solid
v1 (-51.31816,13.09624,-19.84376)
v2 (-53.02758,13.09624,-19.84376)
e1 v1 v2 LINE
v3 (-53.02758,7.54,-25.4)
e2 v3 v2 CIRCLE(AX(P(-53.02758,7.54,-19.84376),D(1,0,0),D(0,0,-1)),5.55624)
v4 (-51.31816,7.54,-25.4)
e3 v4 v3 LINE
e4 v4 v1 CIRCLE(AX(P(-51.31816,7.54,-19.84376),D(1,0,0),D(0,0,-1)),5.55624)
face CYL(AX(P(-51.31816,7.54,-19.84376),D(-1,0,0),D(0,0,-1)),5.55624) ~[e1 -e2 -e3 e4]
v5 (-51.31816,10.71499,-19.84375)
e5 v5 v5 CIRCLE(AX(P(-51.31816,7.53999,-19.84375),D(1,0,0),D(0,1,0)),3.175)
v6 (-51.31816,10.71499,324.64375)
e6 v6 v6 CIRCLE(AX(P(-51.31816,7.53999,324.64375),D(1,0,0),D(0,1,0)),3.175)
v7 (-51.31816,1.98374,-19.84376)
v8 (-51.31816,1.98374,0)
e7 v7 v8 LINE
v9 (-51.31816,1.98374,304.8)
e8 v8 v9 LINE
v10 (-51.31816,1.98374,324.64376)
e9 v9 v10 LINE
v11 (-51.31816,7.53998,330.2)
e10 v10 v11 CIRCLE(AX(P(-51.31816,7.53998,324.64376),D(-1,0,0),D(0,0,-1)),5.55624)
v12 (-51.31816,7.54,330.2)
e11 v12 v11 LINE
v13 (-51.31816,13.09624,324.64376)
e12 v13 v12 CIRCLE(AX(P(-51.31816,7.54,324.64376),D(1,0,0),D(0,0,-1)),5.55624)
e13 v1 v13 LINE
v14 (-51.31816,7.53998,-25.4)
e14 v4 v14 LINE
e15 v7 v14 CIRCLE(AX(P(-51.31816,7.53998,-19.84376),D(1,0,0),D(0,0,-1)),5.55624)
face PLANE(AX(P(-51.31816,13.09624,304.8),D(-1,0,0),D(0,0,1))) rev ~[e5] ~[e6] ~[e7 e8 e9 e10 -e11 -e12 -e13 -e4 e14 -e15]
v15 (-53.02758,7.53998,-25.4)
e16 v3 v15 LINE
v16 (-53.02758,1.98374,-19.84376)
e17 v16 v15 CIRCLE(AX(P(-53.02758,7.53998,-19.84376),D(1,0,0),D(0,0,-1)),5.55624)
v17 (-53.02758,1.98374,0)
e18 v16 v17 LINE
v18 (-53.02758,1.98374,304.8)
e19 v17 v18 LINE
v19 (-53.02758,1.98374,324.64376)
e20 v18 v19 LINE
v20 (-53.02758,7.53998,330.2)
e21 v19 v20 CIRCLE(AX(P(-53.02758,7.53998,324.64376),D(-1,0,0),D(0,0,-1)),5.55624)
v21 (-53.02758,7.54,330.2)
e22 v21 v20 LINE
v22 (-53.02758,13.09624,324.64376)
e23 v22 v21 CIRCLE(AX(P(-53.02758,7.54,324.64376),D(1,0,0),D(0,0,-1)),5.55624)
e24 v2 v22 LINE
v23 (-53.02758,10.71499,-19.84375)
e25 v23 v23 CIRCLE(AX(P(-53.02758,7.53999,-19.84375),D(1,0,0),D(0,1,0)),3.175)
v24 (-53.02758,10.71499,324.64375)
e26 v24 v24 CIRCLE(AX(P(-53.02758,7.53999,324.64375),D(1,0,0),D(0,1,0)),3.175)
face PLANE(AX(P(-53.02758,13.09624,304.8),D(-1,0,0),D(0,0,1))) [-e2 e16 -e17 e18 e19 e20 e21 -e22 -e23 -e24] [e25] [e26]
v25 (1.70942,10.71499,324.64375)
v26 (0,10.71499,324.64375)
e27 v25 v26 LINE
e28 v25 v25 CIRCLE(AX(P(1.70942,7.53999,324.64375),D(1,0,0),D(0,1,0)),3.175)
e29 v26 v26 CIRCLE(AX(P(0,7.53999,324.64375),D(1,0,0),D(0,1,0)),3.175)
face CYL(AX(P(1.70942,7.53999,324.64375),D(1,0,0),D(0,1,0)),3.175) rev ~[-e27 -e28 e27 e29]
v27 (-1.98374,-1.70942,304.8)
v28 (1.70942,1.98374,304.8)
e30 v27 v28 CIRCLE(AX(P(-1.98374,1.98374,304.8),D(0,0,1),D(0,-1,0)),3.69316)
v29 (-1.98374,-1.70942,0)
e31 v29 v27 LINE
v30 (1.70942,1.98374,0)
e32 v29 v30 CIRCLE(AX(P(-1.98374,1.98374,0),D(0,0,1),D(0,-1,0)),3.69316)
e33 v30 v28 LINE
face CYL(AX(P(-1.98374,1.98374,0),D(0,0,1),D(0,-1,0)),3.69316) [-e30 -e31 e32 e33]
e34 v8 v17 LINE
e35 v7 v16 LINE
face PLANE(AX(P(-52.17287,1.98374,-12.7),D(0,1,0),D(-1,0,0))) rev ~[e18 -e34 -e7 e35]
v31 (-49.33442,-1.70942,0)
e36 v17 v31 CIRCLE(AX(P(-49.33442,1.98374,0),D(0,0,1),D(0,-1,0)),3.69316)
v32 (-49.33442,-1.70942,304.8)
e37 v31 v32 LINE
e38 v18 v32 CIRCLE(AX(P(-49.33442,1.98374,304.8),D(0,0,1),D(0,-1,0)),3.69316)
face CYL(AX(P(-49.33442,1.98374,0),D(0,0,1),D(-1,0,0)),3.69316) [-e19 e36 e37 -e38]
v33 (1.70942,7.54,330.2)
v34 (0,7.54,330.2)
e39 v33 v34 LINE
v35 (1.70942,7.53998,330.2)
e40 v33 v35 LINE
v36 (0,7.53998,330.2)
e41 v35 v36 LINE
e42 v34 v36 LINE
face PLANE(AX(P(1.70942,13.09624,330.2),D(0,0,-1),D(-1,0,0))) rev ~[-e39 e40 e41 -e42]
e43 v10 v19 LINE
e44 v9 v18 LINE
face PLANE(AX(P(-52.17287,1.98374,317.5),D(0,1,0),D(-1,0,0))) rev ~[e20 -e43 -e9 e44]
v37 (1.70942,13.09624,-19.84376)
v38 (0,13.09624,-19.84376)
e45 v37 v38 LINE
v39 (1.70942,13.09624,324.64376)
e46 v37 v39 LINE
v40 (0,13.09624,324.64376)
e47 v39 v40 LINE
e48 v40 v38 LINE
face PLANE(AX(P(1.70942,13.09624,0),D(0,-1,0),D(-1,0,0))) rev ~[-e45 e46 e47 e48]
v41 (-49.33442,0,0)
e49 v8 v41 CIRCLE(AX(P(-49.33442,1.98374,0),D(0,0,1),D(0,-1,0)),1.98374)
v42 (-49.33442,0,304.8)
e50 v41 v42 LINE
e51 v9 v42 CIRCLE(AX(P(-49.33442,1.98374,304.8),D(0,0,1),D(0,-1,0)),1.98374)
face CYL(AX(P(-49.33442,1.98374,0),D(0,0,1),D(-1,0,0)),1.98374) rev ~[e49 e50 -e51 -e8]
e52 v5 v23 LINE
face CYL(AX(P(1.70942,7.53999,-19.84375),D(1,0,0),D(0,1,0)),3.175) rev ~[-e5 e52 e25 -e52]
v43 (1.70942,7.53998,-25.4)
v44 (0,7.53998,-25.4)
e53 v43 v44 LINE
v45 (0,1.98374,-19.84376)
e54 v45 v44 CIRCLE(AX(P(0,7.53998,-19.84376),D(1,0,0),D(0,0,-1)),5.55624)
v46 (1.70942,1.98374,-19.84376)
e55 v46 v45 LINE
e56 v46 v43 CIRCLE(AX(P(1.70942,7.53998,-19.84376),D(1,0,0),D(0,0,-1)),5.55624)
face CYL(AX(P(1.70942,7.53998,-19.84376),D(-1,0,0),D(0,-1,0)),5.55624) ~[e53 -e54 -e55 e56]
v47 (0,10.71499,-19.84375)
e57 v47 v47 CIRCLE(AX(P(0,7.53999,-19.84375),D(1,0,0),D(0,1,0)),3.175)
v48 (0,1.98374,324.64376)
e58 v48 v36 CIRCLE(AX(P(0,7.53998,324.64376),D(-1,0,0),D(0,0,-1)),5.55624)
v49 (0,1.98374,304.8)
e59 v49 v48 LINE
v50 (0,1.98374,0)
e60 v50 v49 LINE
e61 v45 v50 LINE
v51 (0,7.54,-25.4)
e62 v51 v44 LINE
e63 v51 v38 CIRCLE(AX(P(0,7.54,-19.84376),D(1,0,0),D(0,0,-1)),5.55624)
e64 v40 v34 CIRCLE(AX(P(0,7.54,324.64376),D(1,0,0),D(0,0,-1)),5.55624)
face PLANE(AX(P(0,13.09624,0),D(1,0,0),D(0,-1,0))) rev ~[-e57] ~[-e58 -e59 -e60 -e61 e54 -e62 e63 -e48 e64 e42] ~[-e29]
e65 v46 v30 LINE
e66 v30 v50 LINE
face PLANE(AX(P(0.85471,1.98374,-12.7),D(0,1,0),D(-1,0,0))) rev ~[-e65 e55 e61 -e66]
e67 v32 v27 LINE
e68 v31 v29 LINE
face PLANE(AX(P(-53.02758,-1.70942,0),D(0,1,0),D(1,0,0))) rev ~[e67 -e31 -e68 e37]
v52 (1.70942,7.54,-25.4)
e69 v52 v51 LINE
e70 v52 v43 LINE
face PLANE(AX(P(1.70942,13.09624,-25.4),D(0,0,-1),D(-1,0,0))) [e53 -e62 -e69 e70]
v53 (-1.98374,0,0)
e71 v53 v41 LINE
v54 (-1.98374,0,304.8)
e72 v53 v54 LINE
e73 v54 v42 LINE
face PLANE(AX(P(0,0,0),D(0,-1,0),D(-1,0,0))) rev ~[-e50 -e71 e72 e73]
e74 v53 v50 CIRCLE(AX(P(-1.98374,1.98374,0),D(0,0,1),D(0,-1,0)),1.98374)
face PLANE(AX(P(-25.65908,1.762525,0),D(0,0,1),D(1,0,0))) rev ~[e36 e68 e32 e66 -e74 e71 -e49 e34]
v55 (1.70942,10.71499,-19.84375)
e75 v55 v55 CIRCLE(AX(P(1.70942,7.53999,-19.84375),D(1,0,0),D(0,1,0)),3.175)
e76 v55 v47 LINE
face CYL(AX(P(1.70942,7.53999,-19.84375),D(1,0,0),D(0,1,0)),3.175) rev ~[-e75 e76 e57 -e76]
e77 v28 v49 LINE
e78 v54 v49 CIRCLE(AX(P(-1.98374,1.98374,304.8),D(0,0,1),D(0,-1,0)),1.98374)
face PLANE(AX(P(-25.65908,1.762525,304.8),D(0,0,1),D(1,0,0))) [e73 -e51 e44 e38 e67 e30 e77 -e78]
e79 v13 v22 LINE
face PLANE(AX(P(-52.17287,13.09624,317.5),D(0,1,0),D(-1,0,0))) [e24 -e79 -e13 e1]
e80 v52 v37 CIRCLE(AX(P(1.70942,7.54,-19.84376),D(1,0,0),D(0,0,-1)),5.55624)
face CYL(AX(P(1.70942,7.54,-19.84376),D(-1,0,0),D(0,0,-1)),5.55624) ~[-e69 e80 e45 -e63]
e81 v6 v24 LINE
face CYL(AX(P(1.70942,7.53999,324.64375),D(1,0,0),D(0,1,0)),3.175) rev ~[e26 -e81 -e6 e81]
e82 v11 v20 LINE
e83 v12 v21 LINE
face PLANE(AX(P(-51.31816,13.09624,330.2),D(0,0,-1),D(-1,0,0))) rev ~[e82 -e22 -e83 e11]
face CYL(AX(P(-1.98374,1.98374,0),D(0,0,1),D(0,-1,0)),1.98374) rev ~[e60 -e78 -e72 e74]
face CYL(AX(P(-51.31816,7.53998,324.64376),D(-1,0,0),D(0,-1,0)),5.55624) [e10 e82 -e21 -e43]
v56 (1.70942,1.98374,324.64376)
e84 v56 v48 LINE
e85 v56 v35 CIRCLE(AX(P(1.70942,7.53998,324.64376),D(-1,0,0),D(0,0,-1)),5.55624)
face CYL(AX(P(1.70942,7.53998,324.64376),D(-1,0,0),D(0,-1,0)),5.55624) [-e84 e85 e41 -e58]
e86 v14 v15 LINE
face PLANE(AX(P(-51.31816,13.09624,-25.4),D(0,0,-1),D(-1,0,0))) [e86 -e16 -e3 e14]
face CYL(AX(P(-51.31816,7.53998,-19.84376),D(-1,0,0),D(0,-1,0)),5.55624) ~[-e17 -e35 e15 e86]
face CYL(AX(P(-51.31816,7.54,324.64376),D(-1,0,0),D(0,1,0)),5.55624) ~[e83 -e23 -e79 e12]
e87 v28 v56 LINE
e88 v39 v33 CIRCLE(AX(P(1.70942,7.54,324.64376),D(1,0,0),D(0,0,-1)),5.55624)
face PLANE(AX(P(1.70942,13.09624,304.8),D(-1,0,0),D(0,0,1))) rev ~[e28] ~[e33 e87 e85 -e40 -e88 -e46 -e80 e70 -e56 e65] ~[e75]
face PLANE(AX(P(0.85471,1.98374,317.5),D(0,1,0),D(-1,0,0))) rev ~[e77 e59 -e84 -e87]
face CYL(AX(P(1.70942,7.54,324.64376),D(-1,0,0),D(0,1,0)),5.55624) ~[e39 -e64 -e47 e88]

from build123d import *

# Parameters (mm, degrees)
F1_DEPTH = 304.8
F2_R     = 3.69316
F3_R     = 1.98374
F4_W     = 1.70942
F4_H     = 25.4
F6_DEPTH = 11.1125
F7_R     = 5.55624
F8_R     = 3.175
F9_DEPTH = 54.737


# Not quite as in the source:
# - a fillet or chamfer is up to 0.001 mm smaller than in the source, because OpenCascade refuses the exact size


with BuildPart() as f1:
    # F0 (on Top) → F1 (new body)
    with BuildSketch(Plane.XY):
        Polygon((0, 13.09624), (0, 0), (-51.31816, 0), (-51.31816, 13.09624), (-53.02758, 13.09624), (-53.02758, -1.70942), (1.70942, -1.70942), (1.70942, 13.09624), align=None)
    extrude(amount=F1_DEPTH)

    # F2
    f2_edges = [f1.edges().sort_by_distance(p)[0] for p in [
        (1.70942, -1.70942, 152.4),
        (-53.02758, -1.70942, 152.4),
    ]]
    fillet(f2_edges, radius=F2_R)

    # F3
    f3_edges = [f1.edges().sort_by_distance(p)[0] for p in [
        (0, 0, 152.4),
        (-51.31816, 0, 152.4),
    ]]
    fillet(f3_edges, radius=F3_R)

    # F4 (on face) → F6 (join, through all)
    with BuildSketch(Plane(origin=(0, 13.09624, 0), x_dir=(-1, 0, 0), z_dir=(0, 1, 0))):
        with Locations((52.17287, 317.5)):
            Rectangle(F4_W, F4_H)
        with Locations((-0.85471, 317.5)):
            Rectangle(F4_W, F4_H)
        with Locations((-0.85471, -12.7)):
            Rectangle(F4_W, F4_H)
        with Locations((52.17287, -12.7)):
            Rectangle(F4_W, F4_H)
    extrude(amount=-F6_DEPTH)

    # F7 (radius 5.55625 in the source; OpenCascade refuses exactly that, so slightly less here)
    f7_edges = [f1.edges().sort_by_distance(p)[0] for p in [
        (-52.17287, 13.09624, -25.4),
        (0.85471, 13.09624, -25.4),
        (0.85471, 13.09624, 330.2),
        (-52.17287, 13.09624, 330.2),
        (-52.17287, 1.98374, -25.4),
        (-52.17287, 1.98374, 330.2),
        (0.85471, 1.98374, 330.2),
        (0.85471, 1.98374, -25.4),
    ]]
    fillet(f7_edges, radius=F7_R)

    # F8 (on face) → F9 (cut, through all)
    with BuildSketch(Plane.YZ.offset(1.70942)):
        with Locations((7.53999, -19.84375)):
            Circle(F8_R)
        with Locations((7.53999, 324.64375)):
            Circle(F8_R)
    extrude(amount=-F9_DEPTH, mode=Mode.SUBTRACT)


solid = f1.part
